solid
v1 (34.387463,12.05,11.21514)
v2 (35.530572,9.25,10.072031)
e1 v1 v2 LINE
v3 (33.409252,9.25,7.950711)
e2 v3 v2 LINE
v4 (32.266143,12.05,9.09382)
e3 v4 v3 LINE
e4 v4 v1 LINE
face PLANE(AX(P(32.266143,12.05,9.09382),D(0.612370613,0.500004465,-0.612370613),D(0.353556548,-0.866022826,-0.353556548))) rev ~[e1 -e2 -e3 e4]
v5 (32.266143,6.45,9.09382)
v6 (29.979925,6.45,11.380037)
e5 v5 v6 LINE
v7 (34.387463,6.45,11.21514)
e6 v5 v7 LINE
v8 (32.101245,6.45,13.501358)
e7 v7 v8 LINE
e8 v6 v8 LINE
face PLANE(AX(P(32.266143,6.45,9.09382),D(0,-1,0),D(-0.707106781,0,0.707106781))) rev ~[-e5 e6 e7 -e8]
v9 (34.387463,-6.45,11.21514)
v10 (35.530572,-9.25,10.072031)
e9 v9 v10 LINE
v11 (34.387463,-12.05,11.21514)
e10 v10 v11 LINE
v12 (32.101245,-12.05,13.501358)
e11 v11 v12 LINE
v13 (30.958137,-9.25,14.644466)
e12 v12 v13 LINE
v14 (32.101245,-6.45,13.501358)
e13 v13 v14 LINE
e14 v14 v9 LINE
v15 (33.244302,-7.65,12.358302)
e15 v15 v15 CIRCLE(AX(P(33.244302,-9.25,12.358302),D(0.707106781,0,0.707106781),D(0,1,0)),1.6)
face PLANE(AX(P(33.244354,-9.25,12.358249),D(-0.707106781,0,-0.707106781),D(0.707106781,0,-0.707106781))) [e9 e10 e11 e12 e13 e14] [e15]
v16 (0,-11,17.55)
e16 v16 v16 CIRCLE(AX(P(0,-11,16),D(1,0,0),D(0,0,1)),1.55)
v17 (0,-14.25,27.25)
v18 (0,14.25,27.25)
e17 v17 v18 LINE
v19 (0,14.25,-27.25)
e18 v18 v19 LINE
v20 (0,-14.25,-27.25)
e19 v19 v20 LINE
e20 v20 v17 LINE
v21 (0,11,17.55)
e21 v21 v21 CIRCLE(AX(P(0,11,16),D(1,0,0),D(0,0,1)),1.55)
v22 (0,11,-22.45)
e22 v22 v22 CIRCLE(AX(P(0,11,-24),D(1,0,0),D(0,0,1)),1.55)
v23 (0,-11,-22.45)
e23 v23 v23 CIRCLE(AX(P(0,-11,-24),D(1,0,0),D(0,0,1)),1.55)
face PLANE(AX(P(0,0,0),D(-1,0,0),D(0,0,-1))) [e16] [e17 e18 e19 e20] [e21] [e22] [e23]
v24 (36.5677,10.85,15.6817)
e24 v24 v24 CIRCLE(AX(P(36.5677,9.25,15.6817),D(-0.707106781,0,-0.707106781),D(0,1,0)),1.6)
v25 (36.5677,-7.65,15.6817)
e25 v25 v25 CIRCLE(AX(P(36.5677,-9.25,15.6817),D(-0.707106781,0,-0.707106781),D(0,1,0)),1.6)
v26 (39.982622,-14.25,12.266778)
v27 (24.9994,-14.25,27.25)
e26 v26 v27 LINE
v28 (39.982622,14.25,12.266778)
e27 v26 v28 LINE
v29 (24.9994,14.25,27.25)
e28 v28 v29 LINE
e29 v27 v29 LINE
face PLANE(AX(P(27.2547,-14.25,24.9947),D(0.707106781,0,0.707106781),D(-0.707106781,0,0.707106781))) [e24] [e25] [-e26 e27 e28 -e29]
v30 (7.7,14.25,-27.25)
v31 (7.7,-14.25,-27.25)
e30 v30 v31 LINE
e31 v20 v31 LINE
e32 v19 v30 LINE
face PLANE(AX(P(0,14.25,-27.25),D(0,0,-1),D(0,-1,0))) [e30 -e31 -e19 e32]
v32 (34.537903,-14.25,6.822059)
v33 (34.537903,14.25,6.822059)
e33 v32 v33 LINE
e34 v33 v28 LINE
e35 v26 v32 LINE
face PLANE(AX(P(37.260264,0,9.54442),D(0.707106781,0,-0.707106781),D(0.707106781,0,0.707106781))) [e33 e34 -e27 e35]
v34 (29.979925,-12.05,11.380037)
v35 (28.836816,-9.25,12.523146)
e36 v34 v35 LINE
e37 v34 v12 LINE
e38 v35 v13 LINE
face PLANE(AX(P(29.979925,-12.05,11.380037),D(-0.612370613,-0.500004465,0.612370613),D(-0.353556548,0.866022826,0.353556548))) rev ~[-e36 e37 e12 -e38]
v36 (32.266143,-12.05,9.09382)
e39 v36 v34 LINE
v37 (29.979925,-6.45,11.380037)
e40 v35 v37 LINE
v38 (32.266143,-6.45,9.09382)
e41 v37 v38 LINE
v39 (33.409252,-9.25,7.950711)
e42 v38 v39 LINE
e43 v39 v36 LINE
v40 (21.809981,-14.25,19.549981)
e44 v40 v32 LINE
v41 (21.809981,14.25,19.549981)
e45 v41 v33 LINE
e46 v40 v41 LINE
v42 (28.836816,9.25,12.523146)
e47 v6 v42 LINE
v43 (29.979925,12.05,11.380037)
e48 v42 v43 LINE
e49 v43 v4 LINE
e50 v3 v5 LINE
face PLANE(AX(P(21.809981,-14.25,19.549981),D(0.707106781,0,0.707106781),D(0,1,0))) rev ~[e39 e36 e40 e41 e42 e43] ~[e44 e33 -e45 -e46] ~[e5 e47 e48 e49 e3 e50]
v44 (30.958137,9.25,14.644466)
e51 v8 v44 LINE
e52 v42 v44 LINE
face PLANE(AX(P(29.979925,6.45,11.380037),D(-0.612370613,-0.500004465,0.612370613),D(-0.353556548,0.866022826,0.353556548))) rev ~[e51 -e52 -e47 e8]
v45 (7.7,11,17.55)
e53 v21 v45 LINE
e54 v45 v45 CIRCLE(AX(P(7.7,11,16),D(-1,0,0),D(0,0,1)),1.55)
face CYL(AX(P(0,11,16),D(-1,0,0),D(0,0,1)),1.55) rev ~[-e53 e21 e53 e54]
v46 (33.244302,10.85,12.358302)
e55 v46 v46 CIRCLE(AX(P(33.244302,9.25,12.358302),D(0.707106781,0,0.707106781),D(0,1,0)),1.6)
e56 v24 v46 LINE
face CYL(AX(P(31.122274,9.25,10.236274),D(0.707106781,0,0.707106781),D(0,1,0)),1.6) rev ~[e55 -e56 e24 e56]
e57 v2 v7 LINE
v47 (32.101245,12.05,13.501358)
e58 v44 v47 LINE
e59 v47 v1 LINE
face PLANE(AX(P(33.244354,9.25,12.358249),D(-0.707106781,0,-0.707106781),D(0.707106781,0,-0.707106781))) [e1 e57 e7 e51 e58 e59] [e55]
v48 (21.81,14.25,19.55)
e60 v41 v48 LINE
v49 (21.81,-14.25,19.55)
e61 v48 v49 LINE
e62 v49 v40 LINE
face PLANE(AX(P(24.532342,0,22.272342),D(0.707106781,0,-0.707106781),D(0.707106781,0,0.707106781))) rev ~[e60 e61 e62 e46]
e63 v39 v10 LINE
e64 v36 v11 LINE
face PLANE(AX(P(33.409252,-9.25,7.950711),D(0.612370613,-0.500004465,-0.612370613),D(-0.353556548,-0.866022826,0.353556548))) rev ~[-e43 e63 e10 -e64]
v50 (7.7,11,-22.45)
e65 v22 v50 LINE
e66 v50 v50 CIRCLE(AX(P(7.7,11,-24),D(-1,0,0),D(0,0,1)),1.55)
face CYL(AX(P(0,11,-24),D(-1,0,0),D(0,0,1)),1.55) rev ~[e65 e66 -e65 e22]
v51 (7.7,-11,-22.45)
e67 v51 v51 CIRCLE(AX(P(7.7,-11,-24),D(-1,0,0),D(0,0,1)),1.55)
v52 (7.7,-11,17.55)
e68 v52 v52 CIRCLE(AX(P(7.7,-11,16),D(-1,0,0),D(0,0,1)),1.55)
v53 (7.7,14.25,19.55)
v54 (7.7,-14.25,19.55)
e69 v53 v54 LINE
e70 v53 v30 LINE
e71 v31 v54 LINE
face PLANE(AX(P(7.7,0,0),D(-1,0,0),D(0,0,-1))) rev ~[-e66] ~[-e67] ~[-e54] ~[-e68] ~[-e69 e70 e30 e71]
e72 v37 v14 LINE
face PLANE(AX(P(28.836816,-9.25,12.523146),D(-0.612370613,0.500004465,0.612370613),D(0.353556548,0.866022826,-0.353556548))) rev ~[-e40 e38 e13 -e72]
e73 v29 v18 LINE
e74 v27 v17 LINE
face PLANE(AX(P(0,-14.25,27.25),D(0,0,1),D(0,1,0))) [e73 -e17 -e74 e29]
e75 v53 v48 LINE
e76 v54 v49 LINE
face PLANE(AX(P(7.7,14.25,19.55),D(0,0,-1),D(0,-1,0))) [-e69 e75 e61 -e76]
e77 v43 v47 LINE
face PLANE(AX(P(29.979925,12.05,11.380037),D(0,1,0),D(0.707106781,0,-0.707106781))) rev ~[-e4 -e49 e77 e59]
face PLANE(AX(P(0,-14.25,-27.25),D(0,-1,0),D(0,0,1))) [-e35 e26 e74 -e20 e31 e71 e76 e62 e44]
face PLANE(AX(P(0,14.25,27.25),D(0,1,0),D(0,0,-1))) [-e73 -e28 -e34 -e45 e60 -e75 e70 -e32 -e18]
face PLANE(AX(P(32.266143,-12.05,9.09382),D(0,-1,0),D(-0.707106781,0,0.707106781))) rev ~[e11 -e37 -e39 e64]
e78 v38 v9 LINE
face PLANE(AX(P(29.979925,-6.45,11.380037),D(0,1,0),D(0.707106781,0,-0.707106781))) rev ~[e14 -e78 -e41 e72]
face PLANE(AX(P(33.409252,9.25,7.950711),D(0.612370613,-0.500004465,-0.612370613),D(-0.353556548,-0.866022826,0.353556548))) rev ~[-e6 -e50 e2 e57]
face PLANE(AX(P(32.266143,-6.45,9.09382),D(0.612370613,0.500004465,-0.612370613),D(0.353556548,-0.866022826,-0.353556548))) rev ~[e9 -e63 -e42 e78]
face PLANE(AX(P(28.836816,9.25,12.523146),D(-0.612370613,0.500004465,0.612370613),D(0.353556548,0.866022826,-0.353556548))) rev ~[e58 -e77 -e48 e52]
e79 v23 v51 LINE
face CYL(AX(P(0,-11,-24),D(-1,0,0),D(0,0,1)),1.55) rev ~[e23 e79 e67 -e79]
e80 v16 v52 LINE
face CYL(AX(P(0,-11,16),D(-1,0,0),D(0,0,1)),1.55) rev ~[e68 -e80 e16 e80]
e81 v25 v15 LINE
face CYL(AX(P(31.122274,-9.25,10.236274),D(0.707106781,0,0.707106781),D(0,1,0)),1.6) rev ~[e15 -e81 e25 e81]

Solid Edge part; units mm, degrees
sketch "Sketch1" plane through (0, 0, 0) normal (1, 0, 0) x (0, 1, 0)
  line L0 (-14.25, -27.25) -> (-14.25, 27.25)
  line L1 (-14.25, 27.25) -> (14.25, 27.25)
  line L2 (14.25, 27.25) -> (14.25, -27.25)
  line L3 (14.25, -27.25) -> (-14.25, -27.25)
extrude "Protrusion1" add sketch "Sketch1" along normal blind 7.7
sketch "Sketch2" plane through (7.7, 0, 0) normal (1, 0, 0) x (0, 1, 0)
  line L0 (14.25, 19.55) -> (-14.25, 19.55)
  line L1 (-14.25, 19.55) -> (-14.25, 27.25)
  line L2 (-14.25, 27.25) -> (14.25, 27.25)
  line L3 (14.25, 27.25) -> (14.25, 19.55)
extrude "Extrusionsausprägung_2" add sketch "Sketch2" along normal blind 14.11
hole "Bohrung_1" at (0, 11, -24) direction (1, 0, 0) diameter 3.1 end through all
pattern_linear "Pattern1" count 2 spacing 22 along (0, -1, 0) count 2 spacing 40 along (0, 0, 1) of "Bohrung_1"
draft "Formschräge_3" angle 45 neutral plane through (18.75, 0, 19.55) normal (0, 0, -1) pull direction (0, 0, -1) face at (21.81, 9.215, 26.0437)
sketch "Sketch3" plane through (29.505, 0, 27.245) normal (0.7071068, 0, -0.7071068) x (0, 1, 0)
  line L0 (-14.25, -10.8824) -> (14.25, -10.8824)
  line L1 (14.25, -10.8824) -> (14.25, -3.1824)
  line L2 (14.25, -3.1824) -> (-14.25, -3.1824)
  line L3 (-14.25, -3.1824) -> (-14.25, -10.8824)
  dimension "D1" = 28.5
  dimension "D2" = 7.7
extrude "Extrusionsausprägung_3" add sketch "Sketch3" along normal blind 18
sketch "Sketch4" plane through (32.5061, -14.25, 0) normal (0, -1, 0) x (1, 0, 0)
  line L0 (-5.2514, 24.9947) -> (-7.5067, 27.25)
extrude "Cutout1" cut sketch "Sketch4" against normal through all material side at (26.1624, -14.25, 26.1577)
hole "Bohrung_10" at (31.123, -9.25, 10.237) direction (0.7071068, 0, 0.7071068) diameter 3.2 end up to next
hole "Hole1" at (31.123, 9.25, 10.237) direction (0.7071068, 0, 0.7071068) diameter 3.2 end up to next
sketch "Sketch5" plane through (28.8811, 0, 12.4789) normal (-0.7071068, 0, -0.7071068) x (0.7071068, 0, -0.7071068)
  line L0 (4.7872, 12.05) -> (1.554, 12.05)
  line L1 (1.554, 12.05) -> (-0.0626, 9.25)
  line L2 (-0.0626, 9.25) -> (1.554, 6.45)
  line L3 (1.554, 6.45) -> (4.7872, 6.45)
  line L4 (4.7872, 6.45) -> (6.4038, 9.25)
  line L5 (6.4038, 9.25) -> (4.7872, 12.05)
  dimension "D1" = 5.6
extrude "Extrusionsausschnitt_2" cut sketch "Sketch5" against normal blind 3
sketch "Sketch6" plane through (28.8811, 0, 12.4789) normal (-0.7071068, 0, -0.7071068) x (0.7071068, 0, -0.7071068)
  line L0 (4.7872, -12.05) -> (6.4038, -9.25)
  line L1 (6.4038, -9.25) -> (4.7872, -6.45)
  line L2 (4.7872, -6.45) -> (1.554, -6.45)
  line L3 (1.554, -6.45) -> (-0.0626, -9.25)
  line L4 (-0.0626, -9.25) -> (1.554, -12.05)
  line L5 (1.554, -12.05) -> (4.7872, -12.05)
  dimension "D1" = 5.6
extrude "Extrusionsausschnitt_3" cut sketch "Sketch6" against normal blind 3
hole "Hole2" [suppressed]
hole "Hole3" [suppressed]
properties material "PVC"
